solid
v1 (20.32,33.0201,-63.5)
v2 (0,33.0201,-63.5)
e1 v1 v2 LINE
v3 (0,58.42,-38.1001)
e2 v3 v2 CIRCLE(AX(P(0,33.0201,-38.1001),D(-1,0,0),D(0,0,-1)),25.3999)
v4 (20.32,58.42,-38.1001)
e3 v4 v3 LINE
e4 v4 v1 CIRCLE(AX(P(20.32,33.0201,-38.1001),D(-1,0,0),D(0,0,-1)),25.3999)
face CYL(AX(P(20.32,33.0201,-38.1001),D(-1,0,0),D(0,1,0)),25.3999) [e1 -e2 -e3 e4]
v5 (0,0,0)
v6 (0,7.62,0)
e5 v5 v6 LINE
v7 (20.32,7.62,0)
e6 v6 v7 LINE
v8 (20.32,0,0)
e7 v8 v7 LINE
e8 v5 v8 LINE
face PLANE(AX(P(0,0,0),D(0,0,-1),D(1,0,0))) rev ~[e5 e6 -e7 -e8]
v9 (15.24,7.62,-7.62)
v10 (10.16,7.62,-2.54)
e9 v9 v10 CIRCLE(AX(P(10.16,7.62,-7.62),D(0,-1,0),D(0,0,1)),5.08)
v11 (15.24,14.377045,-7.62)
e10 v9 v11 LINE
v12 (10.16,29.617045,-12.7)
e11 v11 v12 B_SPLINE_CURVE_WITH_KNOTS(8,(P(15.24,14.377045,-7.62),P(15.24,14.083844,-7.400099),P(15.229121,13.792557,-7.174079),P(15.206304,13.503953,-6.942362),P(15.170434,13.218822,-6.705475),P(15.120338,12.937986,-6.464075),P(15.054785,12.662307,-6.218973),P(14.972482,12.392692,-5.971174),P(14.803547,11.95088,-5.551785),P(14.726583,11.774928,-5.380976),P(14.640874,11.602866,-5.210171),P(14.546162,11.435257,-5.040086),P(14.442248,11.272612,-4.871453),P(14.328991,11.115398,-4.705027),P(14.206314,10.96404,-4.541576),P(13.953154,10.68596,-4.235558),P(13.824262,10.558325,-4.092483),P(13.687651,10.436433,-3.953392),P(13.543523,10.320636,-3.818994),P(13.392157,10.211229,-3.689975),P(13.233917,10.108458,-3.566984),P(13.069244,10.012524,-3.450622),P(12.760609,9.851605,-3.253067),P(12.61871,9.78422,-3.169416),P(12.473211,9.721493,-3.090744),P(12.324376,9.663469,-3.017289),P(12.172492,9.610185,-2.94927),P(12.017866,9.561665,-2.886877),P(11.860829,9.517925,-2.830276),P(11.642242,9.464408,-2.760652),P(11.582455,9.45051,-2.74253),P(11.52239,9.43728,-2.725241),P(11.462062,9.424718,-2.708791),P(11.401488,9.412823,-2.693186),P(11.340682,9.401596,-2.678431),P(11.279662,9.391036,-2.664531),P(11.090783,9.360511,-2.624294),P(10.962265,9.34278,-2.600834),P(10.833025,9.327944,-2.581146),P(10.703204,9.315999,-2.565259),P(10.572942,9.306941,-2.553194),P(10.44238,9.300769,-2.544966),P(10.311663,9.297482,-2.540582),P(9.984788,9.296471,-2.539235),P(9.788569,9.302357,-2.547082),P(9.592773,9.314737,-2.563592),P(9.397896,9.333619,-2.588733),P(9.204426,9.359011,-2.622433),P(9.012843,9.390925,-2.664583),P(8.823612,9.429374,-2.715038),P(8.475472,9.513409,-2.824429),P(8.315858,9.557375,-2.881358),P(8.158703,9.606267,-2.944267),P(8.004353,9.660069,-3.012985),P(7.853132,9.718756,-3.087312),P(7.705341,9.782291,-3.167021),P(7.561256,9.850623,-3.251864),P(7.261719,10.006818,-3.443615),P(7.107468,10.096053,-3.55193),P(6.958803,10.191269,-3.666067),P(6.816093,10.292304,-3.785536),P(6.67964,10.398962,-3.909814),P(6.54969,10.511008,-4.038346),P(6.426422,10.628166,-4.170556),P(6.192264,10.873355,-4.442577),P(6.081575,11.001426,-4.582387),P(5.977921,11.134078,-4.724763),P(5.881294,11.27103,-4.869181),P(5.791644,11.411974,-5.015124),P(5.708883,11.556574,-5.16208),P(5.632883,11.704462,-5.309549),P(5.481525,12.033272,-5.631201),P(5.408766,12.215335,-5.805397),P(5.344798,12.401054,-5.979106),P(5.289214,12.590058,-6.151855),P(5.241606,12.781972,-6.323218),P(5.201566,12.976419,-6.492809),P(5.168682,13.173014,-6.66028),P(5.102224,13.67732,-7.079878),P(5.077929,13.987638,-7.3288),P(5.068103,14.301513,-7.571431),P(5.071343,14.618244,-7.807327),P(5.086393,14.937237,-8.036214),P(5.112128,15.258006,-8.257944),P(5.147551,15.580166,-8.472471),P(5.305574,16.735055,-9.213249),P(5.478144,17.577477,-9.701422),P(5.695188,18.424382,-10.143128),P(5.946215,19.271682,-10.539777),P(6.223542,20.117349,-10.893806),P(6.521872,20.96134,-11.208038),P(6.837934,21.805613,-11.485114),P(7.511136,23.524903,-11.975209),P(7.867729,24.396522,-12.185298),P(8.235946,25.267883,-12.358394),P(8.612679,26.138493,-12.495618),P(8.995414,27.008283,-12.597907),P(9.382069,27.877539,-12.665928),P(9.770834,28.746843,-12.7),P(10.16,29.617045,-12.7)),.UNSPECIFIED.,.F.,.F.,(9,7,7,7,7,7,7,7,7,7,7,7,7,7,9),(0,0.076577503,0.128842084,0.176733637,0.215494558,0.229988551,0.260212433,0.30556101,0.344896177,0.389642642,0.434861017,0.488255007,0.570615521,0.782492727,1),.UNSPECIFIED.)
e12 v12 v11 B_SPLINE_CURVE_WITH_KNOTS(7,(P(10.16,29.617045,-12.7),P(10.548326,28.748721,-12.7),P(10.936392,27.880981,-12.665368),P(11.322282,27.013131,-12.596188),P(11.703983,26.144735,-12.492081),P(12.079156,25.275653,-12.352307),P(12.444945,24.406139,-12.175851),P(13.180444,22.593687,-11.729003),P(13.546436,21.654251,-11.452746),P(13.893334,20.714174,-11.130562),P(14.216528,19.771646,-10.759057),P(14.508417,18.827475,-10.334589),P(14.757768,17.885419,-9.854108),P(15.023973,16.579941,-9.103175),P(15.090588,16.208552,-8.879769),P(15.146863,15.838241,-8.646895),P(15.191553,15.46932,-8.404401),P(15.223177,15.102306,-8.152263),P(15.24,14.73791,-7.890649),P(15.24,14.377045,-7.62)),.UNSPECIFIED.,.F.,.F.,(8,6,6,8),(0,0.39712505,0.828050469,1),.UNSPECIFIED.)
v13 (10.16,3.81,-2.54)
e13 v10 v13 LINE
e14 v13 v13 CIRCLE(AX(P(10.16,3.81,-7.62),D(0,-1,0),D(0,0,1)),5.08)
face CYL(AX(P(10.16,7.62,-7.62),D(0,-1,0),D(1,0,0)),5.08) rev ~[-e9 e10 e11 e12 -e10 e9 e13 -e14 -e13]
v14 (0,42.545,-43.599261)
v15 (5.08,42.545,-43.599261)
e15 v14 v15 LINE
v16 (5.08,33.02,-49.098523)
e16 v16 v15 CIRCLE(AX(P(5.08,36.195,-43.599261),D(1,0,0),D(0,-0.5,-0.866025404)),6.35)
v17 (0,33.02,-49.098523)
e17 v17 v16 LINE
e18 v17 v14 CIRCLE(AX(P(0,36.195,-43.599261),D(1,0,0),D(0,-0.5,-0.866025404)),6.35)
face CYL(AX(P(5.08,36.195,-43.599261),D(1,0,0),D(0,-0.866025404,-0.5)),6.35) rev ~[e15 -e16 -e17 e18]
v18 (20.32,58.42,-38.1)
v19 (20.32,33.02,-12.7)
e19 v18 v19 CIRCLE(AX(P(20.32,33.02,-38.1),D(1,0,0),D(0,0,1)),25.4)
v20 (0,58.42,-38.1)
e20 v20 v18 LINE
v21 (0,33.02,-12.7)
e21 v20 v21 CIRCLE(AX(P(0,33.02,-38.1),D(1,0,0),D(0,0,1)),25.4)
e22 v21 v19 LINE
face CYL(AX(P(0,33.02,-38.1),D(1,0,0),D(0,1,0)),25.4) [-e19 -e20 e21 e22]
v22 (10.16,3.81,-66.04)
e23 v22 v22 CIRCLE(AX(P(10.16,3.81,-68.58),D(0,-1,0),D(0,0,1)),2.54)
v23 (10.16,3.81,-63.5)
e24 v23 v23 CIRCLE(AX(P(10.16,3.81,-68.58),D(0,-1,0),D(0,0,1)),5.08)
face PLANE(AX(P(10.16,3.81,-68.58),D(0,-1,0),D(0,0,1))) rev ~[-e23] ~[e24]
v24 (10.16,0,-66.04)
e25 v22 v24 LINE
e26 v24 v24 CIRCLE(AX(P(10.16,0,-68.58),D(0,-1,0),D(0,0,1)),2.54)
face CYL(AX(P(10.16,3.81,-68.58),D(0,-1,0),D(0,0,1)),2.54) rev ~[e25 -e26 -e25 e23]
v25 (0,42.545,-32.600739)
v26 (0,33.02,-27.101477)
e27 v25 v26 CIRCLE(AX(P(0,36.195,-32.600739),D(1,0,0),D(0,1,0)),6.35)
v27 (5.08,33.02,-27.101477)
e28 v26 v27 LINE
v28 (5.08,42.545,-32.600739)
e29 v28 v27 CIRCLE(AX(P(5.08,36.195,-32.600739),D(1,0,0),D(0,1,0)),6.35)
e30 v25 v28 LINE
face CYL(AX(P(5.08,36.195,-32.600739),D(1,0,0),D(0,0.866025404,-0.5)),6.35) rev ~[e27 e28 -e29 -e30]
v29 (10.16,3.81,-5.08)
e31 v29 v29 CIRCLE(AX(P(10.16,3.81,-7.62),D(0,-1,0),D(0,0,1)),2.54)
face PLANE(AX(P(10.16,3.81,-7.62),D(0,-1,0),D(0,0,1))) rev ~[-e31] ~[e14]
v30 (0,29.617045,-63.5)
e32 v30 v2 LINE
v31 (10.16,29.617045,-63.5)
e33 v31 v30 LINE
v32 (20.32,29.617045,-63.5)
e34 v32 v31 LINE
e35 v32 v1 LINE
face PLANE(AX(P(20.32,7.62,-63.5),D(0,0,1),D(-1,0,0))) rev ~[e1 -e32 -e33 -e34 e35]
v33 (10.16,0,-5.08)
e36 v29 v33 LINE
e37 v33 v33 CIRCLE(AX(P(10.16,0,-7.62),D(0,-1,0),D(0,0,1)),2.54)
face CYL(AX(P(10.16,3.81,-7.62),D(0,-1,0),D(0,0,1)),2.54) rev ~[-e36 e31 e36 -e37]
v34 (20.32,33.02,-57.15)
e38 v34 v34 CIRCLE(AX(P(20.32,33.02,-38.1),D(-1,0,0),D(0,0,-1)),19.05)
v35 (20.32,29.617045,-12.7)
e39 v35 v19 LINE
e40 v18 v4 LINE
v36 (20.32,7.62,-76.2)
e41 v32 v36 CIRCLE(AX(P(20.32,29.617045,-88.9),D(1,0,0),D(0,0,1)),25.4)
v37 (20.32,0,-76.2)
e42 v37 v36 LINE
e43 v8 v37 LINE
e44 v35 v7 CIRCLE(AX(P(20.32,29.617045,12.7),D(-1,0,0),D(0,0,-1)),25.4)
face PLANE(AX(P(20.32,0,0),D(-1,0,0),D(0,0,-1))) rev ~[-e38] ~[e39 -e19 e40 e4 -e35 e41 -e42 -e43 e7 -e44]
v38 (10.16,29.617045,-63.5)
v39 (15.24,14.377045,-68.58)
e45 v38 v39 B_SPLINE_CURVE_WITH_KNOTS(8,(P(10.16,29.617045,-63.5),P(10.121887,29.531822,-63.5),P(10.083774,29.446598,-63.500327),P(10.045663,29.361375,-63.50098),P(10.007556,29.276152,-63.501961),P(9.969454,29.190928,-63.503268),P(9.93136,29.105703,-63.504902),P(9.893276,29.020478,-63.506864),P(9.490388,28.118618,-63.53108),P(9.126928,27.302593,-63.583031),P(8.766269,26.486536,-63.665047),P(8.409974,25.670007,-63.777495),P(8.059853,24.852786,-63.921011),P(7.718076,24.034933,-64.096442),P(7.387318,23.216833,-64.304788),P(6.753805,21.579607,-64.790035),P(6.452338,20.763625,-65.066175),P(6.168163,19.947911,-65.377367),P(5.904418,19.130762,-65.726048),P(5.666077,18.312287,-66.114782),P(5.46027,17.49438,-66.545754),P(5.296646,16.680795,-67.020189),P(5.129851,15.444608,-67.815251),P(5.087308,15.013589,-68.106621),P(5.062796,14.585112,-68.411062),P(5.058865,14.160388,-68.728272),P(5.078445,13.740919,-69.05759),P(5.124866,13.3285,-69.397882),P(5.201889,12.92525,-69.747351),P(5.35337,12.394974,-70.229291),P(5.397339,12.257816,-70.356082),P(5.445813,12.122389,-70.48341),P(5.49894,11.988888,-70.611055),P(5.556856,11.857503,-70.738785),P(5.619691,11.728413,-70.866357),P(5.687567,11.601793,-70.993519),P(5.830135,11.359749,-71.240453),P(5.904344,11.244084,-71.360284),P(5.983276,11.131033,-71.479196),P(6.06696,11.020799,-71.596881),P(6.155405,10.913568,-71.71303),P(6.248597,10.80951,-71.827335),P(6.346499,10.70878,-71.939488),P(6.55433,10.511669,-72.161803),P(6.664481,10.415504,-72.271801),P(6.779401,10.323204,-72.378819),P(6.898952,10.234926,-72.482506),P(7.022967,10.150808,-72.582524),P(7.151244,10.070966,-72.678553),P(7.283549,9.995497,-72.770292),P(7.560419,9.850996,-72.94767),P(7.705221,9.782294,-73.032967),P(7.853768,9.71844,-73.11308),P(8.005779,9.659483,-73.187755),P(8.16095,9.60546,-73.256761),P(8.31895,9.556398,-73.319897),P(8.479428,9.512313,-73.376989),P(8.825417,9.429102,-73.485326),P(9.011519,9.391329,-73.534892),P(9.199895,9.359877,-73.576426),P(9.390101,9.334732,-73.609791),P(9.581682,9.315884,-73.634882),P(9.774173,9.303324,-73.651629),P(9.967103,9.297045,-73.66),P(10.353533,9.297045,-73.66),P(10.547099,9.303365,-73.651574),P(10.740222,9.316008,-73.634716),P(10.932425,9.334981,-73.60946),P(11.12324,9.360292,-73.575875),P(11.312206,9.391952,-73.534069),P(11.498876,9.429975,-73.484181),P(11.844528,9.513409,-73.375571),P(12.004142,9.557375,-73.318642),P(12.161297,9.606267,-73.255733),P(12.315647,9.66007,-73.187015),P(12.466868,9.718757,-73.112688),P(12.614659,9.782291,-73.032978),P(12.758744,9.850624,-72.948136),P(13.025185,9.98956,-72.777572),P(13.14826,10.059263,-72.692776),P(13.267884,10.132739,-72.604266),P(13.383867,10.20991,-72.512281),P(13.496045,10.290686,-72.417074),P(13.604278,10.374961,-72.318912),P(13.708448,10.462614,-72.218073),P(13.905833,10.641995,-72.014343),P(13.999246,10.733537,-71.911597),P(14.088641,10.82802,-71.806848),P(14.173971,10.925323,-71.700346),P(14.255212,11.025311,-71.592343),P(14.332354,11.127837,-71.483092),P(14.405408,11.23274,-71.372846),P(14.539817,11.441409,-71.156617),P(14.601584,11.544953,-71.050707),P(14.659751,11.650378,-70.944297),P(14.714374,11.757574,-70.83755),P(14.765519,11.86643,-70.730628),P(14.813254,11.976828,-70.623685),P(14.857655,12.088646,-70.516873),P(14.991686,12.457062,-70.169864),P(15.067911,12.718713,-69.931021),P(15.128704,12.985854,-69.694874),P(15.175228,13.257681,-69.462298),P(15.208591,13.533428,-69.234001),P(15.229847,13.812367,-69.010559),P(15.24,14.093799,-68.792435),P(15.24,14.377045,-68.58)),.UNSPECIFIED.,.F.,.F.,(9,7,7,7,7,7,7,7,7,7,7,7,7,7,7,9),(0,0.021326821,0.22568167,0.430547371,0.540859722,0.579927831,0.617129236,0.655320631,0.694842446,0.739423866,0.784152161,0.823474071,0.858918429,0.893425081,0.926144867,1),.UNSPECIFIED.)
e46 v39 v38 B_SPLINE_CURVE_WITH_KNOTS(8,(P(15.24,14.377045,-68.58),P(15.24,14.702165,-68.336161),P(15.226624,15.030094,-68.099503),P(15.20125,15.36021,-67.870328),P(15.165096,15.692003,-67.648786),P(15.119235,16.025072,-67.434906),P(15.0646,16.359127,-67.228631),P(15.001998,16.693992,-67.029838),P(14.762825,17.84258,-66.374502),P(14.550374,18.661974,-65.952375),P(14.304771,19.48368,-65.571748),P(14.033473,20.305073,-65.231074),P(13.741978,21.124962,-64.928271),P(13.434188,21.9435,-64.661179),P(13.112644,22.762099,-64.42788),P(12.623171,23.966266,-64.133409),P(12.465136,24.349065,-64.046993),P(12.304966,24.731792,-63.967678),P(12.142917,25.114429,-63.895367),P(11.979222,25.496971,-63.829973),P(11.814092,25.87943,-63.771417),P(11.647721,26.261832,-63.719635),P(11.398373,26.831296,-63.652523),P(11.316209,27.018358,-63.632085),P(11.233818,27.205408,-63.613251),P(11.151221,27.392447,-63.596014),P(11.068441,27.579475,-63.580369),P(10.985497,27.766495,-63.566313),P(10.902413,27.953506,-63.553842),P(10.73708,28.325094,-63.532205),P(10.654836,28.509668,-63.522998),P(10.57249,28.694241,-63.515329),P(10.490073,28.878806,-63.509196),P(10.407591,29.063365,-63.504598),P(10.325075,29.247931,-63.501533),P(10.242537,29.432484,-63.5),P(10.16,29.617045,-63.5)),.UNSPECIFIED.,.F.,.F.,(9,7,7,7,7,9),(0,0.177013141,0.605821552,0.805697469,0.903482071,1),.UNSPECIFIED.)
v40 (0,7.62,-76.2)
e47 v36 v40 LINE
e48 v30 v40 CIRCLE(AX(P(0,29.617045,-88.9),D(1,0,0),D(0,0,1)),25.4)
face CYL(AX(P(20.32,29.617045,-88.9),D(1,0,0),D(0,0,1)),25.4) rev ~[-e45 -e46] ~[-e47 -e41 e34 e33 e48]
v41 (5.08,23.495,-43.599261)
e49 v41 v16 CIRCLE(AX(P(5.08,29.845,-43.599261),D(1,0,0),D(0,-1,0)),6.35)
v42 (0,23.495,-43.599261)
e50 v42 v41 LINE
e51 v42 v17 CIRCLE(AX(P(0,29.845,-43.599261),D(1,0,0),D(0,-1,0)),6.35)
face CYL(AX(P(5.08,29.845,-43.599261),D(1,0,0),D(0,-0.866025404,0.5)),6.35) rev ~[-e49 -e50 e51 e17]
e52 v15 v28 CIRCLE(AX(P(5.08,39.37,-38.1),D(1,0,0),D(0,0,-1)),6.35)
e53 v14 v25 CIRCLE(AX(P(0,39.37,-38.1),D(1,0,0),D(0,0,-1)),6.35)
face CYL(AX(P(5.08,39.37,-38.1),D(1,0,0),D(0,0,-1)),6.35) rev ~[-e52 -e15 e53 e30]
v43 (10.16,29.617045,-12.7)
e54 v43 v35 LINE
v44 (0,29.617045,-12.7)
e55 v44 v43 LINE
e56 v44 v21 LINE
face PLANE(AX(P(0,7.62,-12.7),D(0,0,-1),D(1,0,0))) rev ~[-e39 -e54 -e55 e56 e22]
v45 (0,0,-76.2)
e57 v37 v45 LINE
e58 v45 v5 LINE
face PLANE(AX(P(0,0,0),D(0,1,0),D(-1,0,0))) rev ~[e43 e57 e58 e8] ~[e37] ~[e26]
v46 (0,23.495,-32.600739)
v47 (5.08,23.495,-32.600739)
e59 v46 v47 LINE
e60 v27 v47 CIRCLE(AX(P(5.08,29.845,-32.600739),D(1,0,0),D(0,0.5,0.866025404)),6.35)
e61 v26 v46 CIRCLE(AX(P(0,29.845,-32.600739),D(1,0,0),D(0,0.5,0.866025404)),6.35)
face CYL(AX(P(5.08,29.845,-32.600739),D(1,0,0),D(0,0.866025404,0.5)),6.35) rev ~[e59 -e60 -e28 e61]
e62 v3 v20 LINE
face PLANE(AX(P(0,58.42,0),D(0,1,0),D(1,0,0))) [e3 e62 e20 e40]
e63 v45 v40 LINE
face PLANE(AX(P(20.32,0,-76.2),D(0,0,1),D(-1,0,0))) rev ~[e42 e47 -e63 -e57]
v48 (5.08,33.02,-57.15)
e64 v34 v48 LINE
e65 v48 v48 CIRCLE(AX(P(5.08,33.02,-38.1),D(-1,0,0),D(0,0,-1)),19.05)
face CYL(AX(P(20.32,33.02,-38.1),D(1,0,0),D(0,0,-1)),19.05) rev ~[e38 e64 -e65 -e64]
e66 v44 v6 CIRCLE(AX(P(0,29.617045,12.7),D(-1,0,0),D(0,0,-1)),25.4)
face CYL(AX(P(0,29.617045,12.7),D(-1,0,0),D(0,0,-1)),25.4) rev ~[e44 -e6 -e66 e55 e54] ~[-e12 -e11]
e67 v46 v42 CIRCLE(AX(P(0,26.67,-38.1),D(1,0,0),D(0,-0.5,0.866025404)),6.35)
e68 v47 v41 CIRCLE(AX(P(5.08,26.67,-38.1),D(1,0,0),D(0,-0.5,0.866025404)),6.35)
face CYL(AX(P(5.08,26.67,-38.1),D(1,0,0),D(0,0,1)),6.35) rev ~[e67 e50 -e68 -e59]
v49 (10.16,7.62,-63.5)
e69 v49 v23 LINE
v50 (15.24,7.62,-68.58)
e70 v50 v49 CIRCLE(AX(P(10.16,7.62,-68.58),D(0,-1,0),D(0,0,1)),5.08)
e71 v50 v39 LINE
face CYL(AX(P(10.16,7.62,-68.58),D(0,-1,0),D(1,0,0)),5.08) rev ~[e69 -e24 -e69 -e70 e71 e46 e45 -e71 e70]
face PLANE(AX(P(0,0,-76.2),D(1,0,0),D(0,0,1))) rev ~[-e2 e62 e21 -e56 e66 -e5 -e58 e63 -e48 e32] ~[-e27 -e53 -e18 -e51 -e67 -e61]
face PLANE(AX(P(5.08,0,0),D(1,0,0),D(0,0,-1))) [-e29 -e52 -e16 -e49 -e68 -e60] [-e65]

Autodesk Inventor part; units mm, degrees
ref_plane "YZ Plane" through (0, 0, 0) normal (1, 0, 0) x (0, 1, 0)
ref_plane "XZ Plane" through (0, 0, 0) normal (0, 1, 0) x (-1, 0, 0)
ref_plane "XY Plane" through (0, 0, 0) normal (0, 0, 1) x (1, 0, 0)
sketch "Sketch1" plane through (0, 0, 0) normal (0, 1, 0) x (-1, 0, 0)
  line L0 (0, 0) -> (-20.32, 0)
  line L1 (-20.32, 0) -> (-20.32, -76.2)
  line L2 (-20.32, -76.2) -> (0, -76.2)
  line L3 (0, -76.2) -> (0, 0)
  dimension "d0" = 20.32
  dimension "d1" = 76.2
extrude "Extrusion1" add sketch "Sketch1" along normal blind 7.62
sketch "Sketch2" plane through (0, 7.62, 0) normal (0, 1, 0) x (1, 0, 0)
  line L0 (0, 0) -> (0, 12.7)
  line L1 (0, 76.2) -> (0, 0) projected
  line L2 (20.32, 0) -> (20.32, 76.2) projected
  line L3 (0, 12.7) -> (20.32, 12.7)
  line L4 (20.32, 12.7) -> (20.32, 63.5)
  line L5 (20.32, 63.5) -> (0, 63.5)
  line L6 (0, 63.5) -> (0, 12.7)
  dimension "d4" = 12.7
  dimension "d5" = 50.8
extrude "Extrusion2" add sketch "Sketch2" along normal blind 50.8
sketch "Sketch3" plane through (20.32, 0, 0) normal (1, 0, 0) x (0, 0, -1)
  line L0 (12.7, 58.42) -> (63.5, 58.42) projected
  line L1 (38.1, 58.42) -> (38.1, 33.02)
  circle A0 centre (38.1, 33.02) radius 19.05
  point P0 (0, 0)
  dimension "d8" = 25.4
  dimension "d9" = 38.1
extrude "Extrusion3" cut sketch "Sketch3" against normal blind 15.24
sketch "Sketch4" plane through (5.08, 33.02, -38.1) normal (1, 0, 0) x (0, 0, -1)
  circle A0 centre (0, 0) radius 19.05 projected
  line L0 (0, 19.05) -> (0, 12.7)
  line L1 (0, 12.7) -> (0, 6.35)
  circle A1 centre (0, 6.35) radius 6.35
  point P0 (-38.1, -33.02)
  dimension "d12" = 6.35
  dimension "d13" = 6.35
  dimension "d14" = 12.7
extrude "Extrusion4" cut sketch "Sketch4" against normal blind 5.08 contours A1
sketch "Sketch5" plane through (5.08, 33.02, -38.1) normal (1, 0, 0) x (0, 0, -1)
  circle A0 centre (0, 6.35) radius 6.35 projected
  point P0 (-38.1, -33.02)
  point P1 (0, 0)
pattern_circular "Circular Pattern1" count 6 over 360 about axis through (5.08, 33.02, -38.1) along (1, 0, 0) of "Extrusion4"
fillet "Fillet1" radius 25.4 1 edges at (10.16, 58.42, -12.7)
fillet "Fillet2" radius 25.4 1 edges at (10.16, 58.42, -63.5)
sketch "Sketch6" plane through (0, 7.62, 0) normal (0, 1, 0) x (1, 0, 0)
  line L0 (0, 12.7) -> (20.32, 12.7) projected
  line L1 (10.16, 12.7) -> (10.16, 2.54)
  line L2 (10.16, 12.7) -> (10.16, 7.62)
  line L3 (0, 63.5) -> (20.32, 63.5) projected
  line L4 (10.16, 63.5) -> (10.16, 68.58)
  circle A0 centre (10.16, 7.62) radius 2.54
  circle A1 centre (10.16, 68.58) radius 2.54
  point P0 (0, 0)
  dimension "d24" = 10.16
  dimension "d25" = 5.08
  dimension "d26" = 5.08
  dimension "d27" = 5.08
  dimension "d28" = 5.08
fillet "Fillet5" radius 25.4 2 edges at (10.16, 7.62, -63.5) (10.16, 7.62, -12.7)
hole "Hole1" at (10.16, 7.62, -7.62) at (10.16, 7.62, -68.58) direction (0, -1, 0) diameter 5.08 end through all counterbore diameter 10.16 counterbore depth 3.81
sketch "Sketch8" plane through (10.16, 7.62, -7.62) normal (0, -1, 0) x (1, 0, 0)
  circle A0 centre (0, 0) radius 5.08
  circle A1 centre (0, -60.96) radius 2.54 projected
  line L0 (-2.54, -60.96) -> (0, -60.96)
  circle A2 centre (0, -60.96) radius 5.08
  point P0 (-10.16, 7.62)
  dimension "d37" = 10.16
  dimension "d38" = 10.16
extrude "Extrusion5" cut sketch "Sketch8" against normal blind 25.4 contours A0 | A1 | A2
sketch "Sketch9" plane through (5.08, 33.02, -38.1) normal (1, 0, 0) x (0, 0, -1)
  arc A0 (5.4993, 9.525) -> (-5.4993, 9.525) centre (0, 6.35) ccw projected
  arc A1 (-5.4993, -9.525) -> (5.4993, -9.525) centre (0, -6.35) ccw projected
  point P0 (-38.1, -33.02)
  point P1 (0, 12.7)
  point P2 (0, -12.7)
properties part number "Motor Mount V1"
